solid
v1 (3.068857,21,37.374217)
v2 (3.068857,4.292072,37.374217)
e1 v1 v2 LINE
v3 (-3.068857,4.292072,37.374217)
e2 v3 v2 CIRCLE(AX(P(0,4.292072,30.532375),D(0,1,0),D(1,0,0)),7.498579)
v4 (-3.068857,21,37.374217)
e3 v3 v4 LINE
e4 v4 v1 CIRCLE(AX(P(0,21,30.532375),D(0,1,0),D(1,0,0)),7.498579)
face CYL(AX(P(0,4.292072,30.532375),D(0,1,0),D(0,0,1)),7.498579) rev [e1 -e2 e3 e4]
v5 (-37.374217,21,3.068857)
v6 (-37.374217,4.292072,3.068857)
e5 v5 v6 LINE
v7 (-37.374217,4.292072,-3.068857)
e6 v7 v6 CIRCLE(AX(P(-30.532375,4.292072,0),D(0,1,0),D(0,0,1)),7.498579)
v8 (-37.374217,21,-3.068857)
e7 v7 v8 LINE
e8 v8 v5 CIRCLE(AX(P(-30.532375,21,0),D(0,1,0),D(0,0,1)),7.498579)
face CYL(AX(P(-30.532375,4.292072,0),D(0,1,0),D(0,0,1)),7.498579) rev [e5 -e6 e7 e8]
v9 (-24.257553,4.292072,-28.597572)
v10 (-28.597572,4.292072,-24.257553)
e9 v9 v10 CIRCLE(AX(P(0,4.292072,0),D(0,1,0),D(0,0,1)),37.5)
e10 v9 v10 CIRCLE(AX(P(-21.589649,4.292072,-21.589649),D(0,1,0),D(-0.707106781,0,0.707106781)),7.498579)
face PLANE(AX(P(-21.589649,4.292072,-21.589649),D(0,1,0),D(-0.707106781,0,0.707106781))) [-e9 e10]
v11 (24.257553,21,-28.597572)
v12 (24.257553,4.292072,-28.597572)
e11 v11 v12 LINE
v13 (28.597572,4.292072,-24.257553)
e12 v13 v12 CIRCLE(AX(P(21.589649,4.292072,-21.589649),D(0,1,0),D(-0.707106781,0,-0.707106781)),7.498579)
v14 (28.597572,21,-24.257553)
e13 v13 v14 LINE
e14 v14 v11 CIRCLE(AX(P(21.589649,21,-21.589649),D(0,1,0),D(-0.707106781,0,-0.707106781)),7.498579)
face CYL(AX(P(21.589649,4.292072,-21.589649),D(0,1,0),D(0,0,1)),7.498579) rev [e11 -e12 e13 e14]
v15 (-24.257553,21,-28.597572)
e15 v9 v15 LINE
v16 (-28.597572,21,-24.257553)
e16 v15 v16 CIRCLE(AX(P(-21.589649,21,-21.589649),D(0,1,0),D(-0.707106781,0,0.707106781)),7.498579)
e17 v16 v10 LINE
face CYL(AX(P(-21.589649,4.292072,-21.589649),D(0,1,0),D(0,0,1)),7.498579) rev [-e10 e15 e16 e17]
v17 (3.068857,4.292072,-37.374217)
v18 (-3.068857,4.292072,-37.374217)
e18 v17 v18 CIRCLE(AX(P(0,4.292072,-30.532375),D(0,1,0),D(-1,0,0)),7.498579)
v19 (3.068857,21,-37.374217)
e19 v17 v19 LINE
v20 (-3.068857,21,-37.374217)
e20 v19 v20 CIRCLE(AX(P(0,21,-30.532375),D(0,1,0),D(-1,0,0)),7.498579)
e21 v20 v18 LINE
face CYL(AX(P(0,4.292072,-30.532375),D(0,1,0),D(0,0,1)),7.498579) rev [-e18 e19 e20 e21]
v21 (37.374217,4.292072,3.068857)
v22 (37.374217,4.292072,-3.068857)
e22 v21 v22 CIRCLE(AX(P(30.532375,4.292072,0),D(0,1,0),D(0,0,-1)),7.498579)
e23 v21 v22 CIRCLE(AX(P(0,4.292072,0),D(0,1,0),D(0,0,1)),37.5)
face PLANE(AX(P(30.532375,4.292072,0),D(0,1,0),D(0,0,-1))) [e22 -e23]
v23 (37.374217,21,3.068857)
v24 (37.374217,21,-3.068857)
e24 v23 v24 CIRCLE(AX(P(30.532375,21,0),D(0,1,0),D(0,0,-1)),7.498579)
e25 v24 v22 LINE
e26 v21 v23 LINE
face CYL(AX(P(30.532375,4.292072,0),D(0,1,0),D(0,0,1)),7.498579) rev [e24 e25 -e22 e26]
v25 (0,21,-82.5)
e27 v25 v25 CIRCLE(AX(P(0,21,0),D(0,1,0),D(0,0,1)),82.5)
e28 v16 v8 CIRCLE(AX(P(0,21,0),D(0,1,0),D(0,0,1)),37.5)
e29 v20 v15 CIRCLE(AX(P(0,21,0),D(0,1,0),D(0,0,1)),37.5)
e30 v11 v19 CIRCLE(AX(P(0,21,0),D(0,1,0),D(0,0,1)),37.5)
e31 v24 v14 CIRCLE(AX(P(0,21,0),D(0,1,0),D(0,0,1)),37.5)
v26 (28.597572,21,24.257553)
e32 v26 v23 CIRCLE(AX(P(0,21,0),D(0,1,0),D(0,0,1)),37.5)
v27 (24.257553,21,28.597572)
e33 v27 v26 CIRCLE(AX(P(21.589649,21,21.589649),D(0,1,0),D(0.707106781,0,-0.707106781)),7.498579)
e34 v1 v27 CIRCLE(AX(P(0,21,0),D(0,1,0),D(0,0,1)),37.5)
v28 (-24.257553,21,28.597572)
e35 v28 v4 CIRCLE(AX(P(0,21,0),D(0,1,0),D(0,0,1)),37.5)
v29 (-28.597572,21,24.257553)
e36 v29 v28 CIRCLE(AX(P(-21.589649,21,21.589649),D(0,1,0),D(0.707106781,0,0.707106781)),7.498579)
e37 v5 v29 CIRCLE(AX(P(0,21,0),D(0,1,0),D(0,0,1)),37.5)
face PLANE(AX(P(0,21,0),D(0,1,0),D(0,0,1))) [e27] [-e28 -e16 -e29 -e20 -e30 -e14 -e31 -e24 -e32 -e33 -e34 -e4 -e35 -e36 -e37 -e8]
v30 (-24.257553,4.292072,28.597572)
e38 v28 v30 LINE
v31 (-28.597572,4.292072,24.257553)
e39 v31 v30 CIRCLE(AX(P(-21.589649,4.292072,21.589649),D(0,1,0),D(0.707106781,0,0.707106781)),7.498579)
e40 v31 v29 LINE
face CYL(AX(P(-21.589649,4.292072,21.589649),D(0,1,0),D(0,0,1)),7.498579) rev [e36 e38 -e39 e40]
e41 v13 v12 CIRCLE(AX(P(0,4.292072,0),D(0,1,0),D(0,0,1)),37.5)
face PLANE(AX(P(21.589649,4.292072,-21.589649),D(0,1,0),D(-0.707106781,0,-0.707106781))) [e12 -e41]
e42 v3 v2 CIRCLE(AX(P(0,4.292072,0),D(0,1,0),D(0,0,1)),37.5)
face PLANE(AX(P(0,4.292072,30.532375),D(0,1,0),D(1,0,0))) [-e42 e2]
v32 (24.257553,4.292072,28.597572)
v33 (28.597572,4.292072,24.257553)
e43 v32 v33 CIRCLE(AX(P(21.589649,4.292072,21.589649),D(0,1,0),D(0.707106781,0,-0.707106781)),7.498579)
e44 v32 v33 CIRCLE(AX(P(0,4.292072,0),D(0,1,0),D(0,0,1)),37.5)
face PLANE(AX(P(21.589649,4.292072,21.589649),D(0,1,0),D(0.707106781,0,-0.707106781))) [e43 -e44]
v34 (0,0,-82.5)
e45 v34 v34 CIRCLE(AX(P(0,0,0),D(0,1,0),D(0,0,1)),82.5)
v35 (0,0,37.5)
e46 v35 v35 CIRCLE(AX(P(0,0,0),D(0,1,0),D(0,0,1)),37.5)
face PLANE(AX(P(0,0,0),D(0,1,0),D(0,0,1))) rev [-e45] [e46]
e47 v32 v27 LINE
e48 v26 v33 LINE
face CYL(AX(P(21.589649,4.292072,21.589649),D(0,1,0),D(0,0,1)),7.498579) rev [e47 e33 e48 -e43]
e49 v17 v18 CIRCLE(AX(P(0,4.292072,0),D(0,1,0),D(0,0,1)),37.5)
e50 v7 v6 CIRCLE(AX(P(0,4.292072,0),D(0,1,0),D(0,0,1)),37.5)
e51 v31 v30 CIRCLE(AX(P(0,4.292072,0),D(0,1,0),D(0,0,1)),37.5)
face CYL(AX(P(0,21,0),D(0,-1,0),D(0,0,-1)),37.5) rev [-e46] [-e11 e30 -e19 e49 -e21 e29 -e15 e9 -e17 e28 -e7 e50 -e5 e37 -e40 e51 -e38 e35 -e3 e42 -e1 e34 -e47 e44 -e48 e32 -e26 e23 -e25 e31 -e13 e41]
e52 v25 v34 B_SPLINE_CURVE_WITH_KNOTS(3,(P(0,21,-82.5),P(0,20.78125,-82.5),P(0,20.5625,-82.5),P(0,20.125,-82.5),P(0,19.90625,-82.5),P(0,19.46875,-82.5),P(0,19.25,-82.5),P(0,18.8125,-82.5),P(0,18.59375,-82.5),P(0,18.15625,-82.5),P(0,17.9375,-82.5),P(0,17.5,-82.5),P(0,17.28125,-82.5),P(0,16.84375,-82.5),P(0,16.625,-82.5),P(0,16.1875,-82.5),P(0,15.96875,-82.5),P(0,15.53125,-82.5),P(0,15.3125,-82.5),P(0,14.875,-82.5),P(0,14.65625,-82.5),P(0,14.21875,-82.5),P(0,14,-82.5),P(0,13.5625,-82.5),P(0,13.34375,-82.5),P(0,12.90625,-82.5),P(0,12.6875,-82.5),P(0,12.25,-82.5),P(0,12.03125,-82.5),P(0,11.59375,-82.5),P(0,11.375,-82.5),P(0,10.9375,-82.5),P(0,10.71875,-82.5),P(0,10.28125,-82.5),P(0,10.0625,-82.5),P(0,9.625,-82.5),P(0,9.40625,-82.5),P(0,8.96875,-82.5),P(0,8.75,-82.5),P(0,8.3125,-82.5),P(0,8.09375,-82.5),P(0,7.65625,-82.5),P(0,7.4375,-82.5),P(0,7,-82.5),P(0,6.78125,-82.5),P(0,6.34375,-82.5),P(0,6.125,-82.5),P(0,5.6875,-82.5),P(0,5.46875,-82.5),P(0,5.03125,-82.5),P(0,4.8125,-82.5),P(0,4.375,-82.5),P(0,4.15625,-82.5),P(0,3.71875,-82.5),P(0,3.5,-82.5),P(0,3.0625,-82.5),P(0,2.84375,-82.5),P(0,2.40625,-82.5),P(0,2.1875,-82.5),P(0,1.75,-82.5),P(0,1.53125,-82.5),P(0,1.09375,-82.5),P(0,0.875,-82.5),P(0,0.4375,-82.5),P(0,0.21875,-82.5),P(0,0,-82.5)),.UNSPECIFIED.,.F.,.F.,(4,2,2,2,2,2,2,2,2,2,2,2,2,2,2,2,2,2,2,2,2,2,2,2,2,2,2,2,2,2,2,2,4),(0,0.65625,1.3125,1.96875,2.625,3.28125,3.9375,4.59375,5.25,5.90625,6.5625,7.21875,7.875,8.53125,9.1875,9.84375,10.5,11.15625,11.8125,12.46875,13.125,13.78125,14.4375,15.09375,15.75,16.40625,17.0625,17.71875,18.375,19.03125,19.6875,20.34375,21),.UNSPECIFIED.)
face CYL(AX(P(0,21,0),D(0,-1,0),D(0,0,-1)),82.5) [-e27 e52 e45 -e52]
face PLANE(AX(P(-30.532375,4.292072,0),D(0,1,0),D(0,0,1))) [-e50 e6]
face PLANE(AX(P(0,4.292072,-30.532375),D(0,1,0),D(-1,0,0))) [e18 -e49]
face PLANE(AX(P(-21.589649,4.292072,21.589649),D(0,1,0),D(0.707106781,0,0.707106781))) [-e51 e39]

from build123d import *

# Parameters (mm, degrees)
SKETCH1_R           = 82.5
BOSS_EXTRUDE1_DEPTH = 21
SKETCH2_R           = 37.5
CUT_EXTRUDE1_DEPTH  = 119.547458851
SKETCH3_R           = 7.498579311
CUT_EXTRUDE2_DEPTH  = 16.707928145
CIRPATTERN1_COUNT   = 8


with BuildPart() as part:
    # Sketch1 → Boss-Extrude1 (new body)
    with BuildSketch(Plane(origin=(0, 0, 0), x_dir=(1, 0, 0), z_dir=(0, 1, 0))):
        Circle(SKETCH1_R)
    extrude(amount=BOSS_EXTRUDE1_DEPTH)

    # Sketch2 → Cut-Extrude1 (cut, through all)
    with BuildSketch(Plane(origin=(0, 0, 0), x_dir=(1, 0, 0), z_dir=(0, 1, 0))):
        Circle(SKETCH2_R)
    extrude(amount=CUT_EXTRUDE1_DEPTH, mode=Mode.SUBTRACT)

    # Sketch3 → Cut-Extrude2 (cut)
    with BuildSketch(Plane(origin=(0, 21, 0), x_dir=(1, 0, 0), z_dir=(0, 1, 0))):
        with Locations((-30.532374702, 0)):
            Circle(SKETCH3_R)
    cut_extrude2 = extrude(amount=-CUT_EXTRUDE2_DEPTH, mode=Mode.SUBTRACT)

    # CirPattern1: Cut-Extrude2 ×8 about axis
    cirpattern1_axis = Axis((0, 0, 0), (0, 1, 0))
    for i in range(1, CIRPATTERN1_COUNT):
        add(cut_extrude2.rotate(cirpattern1_axis, i * 360 / CIRPATTERN1_COUNT), mode=Mode.SUBTRACT)


solid = part.part
